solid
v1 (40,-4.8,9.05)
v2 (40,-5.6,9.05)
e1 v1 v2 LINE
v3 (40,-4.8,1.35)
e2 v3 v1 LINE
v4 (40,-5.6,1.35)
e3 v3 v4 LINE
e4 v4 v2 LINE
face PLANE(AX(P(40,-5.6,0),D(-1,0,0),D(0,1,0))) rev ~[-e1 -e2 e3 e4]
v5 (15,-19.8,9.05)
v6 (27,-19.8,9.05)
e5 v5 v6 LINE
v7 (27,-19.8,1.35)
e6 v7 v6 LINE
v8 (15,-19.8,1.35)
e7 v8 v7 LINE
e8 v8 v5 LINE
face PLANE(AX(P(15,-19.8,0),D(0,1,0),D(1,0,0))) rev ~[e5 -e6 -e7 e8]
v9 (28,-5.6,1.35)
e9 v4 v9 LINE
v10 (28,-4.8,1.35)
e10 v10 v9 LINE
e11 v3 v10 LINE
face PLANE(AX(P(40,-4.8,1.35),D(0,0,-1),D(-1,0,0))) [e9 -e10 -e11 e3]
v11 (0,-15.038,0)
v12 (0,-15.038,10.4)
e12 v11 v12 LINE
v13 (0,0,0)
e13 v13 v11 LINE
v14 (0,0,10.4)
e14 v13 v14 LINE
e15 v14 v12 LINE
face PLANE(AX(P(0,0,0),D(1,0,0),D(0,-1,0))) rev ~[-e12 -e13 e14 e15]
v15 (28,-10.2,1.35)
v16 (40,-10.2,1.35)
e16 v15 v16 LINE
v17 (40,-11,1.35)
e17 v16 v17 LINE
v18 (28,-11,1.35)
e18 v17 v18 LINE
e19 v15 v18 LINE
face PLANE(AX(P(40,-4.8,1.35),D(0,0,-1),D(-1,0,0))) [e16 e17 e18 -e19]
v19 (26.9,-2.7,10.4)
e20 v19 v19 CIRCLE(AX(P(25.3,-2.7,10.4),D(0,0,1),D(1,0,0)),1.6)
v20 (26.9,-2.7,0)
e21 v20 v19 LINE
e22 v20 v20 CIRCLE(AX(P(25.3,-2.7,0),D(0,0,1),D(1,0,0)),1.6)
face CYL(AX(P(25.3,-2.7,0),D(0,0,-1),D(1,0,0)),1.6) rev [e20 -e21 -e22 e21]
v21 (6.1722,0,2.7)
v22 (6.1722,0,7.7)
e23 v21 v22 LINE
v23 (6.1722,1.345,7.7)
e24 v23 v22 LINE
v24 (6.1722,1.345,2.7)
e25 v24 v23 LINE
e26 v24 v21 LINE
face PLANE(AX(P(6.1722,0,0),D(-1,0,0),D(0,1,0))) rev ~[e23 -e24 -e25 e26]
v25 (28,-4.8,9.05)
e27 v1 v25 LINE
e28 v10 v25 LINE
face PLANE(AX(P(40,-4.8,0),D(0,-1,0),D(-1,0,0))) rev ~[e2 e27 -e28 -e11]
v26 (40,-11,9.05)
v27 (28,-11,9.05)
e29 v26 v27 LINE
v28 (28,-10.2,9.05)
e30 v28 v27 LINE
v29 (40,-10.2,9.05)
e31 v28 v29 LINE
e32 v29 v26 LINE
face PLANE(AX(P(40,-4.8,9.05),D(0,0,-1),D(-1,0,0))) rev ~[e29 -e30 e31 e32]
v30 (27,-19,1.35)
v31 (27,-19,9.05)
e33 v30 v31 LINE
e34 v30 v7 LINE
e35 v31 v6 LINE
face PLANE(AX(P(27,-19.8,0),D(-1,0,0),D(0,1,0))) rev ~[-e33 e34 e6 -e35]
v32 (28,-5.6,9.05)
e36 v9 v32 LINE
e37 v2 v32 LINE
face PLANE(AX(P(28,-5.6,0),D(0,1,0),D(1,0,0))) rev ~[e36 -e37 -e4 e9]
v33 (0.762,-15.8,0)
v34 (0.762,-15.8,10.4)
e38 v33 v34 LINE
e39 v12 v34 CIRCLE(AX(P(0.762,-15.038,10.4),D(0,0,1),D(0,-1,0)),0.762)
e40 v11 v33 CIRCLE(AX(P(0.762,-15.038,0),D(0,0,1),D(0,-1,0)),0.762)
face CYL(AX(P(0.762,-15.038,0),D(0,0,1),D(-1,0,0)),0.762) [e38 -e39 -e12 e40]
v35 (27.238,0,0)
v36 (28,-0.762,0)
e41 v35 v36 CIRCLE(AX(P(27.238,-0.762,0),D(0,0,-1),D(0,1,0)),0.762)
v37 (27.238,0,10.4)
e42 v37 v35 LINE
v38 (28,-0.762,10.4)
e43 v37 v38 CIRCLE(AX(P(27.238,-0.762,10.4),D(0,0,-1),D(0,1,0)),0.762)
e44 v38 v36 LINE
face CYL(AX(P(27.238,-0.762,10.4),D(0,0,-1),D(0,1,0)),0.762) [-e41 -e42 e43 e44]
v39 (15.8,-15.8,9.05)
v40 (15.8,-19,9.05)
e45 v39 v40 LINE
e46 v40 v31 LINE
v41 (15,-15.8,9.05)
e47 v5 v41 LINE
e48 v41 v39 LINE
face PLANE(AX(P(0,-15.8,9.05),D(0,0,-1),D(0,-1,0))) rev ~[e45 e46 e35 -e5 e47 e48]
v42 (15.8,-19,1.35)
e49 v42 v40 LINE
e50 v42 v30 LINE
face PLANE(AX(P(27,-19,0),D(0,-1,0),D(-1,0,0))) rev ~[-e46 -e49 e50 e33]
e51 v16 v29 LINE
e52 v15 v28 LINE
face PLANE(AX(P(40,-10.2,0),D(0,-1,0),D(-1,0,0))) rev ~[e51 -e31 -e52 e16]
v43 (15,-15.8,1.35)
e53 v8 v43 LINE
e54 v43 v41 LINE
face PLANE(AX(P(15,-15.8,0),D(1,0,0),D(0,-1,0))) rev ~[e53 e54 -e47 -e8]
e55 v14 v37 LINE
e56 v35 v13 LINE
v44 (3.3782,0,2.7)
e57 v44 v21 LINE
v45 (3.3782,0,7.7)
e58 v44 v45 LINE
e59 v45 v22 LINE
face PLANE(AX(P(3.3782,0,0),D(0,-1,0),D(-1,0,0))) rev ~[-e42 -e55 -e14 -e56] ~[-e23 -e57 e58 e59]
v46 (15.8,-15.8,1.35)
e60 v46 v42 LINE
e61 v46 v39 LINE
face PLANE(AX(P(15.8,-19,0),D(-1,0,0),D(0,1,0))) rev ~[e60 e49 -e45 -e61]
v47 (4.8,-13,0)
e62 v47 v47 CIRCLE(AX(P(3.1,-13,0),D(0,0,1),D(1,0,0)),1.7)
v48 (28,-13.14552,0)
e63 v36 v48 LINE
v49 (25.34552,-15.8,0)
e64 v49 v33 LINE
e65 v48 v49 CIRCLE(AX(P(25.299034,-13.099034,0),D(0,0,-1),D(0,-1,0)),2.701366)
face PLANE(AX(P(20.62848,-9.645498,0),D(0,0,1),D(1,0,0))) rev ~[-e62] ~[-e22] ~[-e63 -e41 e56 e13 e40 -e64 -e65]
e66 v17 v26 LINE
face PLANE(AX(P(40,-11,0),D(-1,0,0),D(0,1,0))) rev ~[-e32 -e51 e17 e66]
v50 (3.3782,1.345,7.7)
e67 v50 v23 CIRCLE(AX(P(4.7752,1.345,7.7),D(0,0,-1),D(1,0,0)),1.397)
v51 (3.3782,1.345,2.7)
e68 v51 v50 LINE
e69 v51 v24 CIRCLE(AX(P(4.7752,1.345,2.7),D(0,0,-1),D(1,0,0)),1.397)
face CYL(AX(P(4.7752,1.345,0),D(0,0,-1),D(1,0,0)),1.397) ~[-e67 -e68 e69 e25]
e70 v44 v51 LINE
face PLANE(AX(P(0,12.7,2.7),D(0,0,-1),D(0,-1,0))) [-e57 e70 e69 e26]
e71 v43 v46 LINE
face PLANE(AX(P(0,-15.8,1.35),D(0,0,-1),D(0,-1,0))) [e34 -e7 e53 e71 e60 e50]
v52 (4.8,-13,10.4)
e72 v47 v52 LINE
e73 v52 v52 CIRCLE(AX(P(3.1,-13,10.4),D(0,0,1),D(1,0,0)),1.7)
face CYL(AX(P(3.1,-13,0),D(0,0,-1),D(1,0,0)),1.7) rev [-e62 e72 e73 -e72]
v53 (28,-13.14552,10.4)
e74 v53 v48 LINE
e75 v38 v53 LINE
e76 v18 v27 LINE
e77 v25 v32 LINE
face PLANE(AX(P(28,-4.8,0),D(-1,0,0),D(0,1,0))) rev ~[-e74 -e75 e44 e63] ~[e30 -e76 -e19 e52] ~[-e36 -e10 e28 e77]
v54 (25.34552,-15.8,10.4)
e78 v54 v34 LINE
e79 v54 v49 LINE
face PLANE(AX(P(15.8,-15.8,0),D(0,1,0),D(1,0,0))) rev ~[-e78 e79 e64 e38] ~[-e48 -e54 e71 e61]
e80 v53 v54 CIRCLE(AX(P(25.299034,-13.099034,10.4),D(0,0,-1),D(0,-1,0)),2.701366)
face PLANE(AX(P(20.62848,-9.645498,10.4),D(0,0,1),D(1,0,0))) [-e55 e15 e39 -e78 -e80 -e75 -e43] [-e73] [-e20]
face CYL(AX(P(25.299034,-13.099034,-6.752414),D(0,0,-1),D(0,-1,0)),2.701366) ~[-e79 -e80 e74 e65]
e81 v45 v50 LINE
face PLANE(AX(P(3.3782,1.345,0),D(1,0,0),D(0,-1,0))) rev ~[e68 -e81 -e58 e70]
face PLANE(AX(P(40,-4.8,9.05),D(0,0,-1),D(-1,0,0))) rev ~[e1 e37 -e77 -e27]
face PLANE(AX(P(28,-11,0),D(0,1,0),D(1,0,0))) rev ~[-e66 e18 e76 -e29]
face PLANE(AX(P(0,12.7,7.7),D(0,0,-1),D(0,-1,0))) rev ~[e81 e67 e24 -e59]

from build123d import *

# Parameters (mm, degrees)
F0_R        = 1.7
F0_R_2      = 1.6
F1_DEPTH    = 10.4
F2_W        = 12.7
F2_H        = 2.7
F2_W_2      = 4
F2_H_2      = 1.35
F3_DEPTH    = 28
F4_W        = 12
F4_H        = 1.35
F5_DEPTH    = 6.2
F6_T1_DEPTH = 23.9048285752
F7_R        = 0.762


# Not quite as in the source:
# - a fillet or chamfer that OpenCascade refuses, or shapes differently, is made with other operations: its cross-section is extruded or revolved along the edge and cut away or added
# - a feature names something its author has since deleted; it is built from what else it names


with BuildPart() as f1:
    # F0 (on Top) → F1 (new body)
    with BuildSketch(Plane.XY):
        with BuildLine():
            Line((3.3782, 0), (0, 0))
            Line((0, 0), (0, -15.8))
            Line((0, -15.8), (15, -15.8))
            Line((15, -15.8), (15, -19.8))
            Line((15, -19.8), (27, -19.8))
            Line((27, -19.8), (27, -19))
            Line((27, -19), (15.8, -19))
            Line((15.8, -19), (15.8, -15.8))
            Line((15.8, -15.8), (28, -15.8))
            Line((28, -15.8), (28, -11))
            Line((28, -11), (40, -11))
            Line((40, -11), (40, -10.2))
            Line((40, -10.2), (28, -10.2))
            Line((28, -10.2), (28, -5.6))
            Line((28, -5.6), (40, -5.6))
            Line((40, -5.6), (40, -4.8))
            Line((40, -4.8), (28, -4.8))
            Line((28, -4.8), (28, 0))
            Line((28, 0), (6.1722, 0))
            Line((6.1722, 0), (6.1722, 1.345))
            ThreePointArc((6.1722, 1.345), (4.7752, 2.742), (3.3782, 1.345))
            Line((3.3782, 1.345), (3.3782, 0))
        make_face()
        with Locations((3.1, -13)):
            Circle(F0_R, mode=Mode.SUBTRACT)
        with Locations((25.3, -2.7)):
            Circle(F0_R_2, mode=Mode.SUBTRACT)
    extrude(amount=F1_DEPTH)

    # F2 (on face) → F3 (cut, through all)
    with BuildSketch(Plane(origin=(0, 0, 0), x_dir=(0, -1, 0), z_dir=(-1, 0, 0))):
        with Locations((-6.35, 9.05)):
            Rectangle(F2_W, F2_H)
        with Locations((-6.35, 1.35)):
            Rectangle(F2_W, F2_H)
        with Locations((17.8, 9.725)):
            Rectangle(F2_W_2, F2_H_2)
        with Locations((17.8, 0.675)):
            Rectangle(F2_W_2, F2_H_2)
    extrude(amount=-F3_DEPTH, mode=Mode.SUBTRACT)

    # F4 (on face) → F5 (cut, through all)
    with BuildSketch(Plane(origin=(0, -4.8, 0), x_dir=(-1, 0, 0), z_dir=(0, 1, 0))):
        with Locations((-34, 9.725)):
            Rectangle(F4_W, F4_H)
        with Locations((-34, 0.675)):
            Rectangle(F4_W, F4_H)
    extrude(amount=-F5_DEPTH, mode=Mode.SUBTRACT)

    # F6: fillet of radius 2.7 on 2 edges, made by hand

    # F6_s2 → F6_t1 (cut)
    with BuildSketch(Plane.XY.offset(-6.7524142876)):
        with BuildLine():
            ThreePointArc((25.2990343146, -15.8004), (27.2091883092, -15.0091883092), (28.0004, -13.0990343146))
            Line((28.0004, -13.0990343146), (28.2705365685, -13.0990343146))
            ThreePointArc((28.2705365685, -13.0990343146), (28.2701365685, -14.4495171573), (28.2701365685, -15.8))
            Line((28.2701365685, -15.8), (28, -16.0701365685))
            ThreePointArc((28, -16.0701365685), (26.6495171573, -16.0701365685), (25.2990343146, -16.0705365685))
            Line((25.2990343146, -16.0705365685), (25.2990343146, -15.8004))
        make_face()
    extrude(amount=F6_T1_DEPTH, mode=Mode.SUBTRACT)

    # F7
    f7_edges = [f1.edges().sort_by_distance(p)[0] for p in [
        (28, 0, 5.2),
        (0, -15.8, 5.2),
    ]]
    fillet(f7_edges, radius=F7_R)


solid = f1.part
